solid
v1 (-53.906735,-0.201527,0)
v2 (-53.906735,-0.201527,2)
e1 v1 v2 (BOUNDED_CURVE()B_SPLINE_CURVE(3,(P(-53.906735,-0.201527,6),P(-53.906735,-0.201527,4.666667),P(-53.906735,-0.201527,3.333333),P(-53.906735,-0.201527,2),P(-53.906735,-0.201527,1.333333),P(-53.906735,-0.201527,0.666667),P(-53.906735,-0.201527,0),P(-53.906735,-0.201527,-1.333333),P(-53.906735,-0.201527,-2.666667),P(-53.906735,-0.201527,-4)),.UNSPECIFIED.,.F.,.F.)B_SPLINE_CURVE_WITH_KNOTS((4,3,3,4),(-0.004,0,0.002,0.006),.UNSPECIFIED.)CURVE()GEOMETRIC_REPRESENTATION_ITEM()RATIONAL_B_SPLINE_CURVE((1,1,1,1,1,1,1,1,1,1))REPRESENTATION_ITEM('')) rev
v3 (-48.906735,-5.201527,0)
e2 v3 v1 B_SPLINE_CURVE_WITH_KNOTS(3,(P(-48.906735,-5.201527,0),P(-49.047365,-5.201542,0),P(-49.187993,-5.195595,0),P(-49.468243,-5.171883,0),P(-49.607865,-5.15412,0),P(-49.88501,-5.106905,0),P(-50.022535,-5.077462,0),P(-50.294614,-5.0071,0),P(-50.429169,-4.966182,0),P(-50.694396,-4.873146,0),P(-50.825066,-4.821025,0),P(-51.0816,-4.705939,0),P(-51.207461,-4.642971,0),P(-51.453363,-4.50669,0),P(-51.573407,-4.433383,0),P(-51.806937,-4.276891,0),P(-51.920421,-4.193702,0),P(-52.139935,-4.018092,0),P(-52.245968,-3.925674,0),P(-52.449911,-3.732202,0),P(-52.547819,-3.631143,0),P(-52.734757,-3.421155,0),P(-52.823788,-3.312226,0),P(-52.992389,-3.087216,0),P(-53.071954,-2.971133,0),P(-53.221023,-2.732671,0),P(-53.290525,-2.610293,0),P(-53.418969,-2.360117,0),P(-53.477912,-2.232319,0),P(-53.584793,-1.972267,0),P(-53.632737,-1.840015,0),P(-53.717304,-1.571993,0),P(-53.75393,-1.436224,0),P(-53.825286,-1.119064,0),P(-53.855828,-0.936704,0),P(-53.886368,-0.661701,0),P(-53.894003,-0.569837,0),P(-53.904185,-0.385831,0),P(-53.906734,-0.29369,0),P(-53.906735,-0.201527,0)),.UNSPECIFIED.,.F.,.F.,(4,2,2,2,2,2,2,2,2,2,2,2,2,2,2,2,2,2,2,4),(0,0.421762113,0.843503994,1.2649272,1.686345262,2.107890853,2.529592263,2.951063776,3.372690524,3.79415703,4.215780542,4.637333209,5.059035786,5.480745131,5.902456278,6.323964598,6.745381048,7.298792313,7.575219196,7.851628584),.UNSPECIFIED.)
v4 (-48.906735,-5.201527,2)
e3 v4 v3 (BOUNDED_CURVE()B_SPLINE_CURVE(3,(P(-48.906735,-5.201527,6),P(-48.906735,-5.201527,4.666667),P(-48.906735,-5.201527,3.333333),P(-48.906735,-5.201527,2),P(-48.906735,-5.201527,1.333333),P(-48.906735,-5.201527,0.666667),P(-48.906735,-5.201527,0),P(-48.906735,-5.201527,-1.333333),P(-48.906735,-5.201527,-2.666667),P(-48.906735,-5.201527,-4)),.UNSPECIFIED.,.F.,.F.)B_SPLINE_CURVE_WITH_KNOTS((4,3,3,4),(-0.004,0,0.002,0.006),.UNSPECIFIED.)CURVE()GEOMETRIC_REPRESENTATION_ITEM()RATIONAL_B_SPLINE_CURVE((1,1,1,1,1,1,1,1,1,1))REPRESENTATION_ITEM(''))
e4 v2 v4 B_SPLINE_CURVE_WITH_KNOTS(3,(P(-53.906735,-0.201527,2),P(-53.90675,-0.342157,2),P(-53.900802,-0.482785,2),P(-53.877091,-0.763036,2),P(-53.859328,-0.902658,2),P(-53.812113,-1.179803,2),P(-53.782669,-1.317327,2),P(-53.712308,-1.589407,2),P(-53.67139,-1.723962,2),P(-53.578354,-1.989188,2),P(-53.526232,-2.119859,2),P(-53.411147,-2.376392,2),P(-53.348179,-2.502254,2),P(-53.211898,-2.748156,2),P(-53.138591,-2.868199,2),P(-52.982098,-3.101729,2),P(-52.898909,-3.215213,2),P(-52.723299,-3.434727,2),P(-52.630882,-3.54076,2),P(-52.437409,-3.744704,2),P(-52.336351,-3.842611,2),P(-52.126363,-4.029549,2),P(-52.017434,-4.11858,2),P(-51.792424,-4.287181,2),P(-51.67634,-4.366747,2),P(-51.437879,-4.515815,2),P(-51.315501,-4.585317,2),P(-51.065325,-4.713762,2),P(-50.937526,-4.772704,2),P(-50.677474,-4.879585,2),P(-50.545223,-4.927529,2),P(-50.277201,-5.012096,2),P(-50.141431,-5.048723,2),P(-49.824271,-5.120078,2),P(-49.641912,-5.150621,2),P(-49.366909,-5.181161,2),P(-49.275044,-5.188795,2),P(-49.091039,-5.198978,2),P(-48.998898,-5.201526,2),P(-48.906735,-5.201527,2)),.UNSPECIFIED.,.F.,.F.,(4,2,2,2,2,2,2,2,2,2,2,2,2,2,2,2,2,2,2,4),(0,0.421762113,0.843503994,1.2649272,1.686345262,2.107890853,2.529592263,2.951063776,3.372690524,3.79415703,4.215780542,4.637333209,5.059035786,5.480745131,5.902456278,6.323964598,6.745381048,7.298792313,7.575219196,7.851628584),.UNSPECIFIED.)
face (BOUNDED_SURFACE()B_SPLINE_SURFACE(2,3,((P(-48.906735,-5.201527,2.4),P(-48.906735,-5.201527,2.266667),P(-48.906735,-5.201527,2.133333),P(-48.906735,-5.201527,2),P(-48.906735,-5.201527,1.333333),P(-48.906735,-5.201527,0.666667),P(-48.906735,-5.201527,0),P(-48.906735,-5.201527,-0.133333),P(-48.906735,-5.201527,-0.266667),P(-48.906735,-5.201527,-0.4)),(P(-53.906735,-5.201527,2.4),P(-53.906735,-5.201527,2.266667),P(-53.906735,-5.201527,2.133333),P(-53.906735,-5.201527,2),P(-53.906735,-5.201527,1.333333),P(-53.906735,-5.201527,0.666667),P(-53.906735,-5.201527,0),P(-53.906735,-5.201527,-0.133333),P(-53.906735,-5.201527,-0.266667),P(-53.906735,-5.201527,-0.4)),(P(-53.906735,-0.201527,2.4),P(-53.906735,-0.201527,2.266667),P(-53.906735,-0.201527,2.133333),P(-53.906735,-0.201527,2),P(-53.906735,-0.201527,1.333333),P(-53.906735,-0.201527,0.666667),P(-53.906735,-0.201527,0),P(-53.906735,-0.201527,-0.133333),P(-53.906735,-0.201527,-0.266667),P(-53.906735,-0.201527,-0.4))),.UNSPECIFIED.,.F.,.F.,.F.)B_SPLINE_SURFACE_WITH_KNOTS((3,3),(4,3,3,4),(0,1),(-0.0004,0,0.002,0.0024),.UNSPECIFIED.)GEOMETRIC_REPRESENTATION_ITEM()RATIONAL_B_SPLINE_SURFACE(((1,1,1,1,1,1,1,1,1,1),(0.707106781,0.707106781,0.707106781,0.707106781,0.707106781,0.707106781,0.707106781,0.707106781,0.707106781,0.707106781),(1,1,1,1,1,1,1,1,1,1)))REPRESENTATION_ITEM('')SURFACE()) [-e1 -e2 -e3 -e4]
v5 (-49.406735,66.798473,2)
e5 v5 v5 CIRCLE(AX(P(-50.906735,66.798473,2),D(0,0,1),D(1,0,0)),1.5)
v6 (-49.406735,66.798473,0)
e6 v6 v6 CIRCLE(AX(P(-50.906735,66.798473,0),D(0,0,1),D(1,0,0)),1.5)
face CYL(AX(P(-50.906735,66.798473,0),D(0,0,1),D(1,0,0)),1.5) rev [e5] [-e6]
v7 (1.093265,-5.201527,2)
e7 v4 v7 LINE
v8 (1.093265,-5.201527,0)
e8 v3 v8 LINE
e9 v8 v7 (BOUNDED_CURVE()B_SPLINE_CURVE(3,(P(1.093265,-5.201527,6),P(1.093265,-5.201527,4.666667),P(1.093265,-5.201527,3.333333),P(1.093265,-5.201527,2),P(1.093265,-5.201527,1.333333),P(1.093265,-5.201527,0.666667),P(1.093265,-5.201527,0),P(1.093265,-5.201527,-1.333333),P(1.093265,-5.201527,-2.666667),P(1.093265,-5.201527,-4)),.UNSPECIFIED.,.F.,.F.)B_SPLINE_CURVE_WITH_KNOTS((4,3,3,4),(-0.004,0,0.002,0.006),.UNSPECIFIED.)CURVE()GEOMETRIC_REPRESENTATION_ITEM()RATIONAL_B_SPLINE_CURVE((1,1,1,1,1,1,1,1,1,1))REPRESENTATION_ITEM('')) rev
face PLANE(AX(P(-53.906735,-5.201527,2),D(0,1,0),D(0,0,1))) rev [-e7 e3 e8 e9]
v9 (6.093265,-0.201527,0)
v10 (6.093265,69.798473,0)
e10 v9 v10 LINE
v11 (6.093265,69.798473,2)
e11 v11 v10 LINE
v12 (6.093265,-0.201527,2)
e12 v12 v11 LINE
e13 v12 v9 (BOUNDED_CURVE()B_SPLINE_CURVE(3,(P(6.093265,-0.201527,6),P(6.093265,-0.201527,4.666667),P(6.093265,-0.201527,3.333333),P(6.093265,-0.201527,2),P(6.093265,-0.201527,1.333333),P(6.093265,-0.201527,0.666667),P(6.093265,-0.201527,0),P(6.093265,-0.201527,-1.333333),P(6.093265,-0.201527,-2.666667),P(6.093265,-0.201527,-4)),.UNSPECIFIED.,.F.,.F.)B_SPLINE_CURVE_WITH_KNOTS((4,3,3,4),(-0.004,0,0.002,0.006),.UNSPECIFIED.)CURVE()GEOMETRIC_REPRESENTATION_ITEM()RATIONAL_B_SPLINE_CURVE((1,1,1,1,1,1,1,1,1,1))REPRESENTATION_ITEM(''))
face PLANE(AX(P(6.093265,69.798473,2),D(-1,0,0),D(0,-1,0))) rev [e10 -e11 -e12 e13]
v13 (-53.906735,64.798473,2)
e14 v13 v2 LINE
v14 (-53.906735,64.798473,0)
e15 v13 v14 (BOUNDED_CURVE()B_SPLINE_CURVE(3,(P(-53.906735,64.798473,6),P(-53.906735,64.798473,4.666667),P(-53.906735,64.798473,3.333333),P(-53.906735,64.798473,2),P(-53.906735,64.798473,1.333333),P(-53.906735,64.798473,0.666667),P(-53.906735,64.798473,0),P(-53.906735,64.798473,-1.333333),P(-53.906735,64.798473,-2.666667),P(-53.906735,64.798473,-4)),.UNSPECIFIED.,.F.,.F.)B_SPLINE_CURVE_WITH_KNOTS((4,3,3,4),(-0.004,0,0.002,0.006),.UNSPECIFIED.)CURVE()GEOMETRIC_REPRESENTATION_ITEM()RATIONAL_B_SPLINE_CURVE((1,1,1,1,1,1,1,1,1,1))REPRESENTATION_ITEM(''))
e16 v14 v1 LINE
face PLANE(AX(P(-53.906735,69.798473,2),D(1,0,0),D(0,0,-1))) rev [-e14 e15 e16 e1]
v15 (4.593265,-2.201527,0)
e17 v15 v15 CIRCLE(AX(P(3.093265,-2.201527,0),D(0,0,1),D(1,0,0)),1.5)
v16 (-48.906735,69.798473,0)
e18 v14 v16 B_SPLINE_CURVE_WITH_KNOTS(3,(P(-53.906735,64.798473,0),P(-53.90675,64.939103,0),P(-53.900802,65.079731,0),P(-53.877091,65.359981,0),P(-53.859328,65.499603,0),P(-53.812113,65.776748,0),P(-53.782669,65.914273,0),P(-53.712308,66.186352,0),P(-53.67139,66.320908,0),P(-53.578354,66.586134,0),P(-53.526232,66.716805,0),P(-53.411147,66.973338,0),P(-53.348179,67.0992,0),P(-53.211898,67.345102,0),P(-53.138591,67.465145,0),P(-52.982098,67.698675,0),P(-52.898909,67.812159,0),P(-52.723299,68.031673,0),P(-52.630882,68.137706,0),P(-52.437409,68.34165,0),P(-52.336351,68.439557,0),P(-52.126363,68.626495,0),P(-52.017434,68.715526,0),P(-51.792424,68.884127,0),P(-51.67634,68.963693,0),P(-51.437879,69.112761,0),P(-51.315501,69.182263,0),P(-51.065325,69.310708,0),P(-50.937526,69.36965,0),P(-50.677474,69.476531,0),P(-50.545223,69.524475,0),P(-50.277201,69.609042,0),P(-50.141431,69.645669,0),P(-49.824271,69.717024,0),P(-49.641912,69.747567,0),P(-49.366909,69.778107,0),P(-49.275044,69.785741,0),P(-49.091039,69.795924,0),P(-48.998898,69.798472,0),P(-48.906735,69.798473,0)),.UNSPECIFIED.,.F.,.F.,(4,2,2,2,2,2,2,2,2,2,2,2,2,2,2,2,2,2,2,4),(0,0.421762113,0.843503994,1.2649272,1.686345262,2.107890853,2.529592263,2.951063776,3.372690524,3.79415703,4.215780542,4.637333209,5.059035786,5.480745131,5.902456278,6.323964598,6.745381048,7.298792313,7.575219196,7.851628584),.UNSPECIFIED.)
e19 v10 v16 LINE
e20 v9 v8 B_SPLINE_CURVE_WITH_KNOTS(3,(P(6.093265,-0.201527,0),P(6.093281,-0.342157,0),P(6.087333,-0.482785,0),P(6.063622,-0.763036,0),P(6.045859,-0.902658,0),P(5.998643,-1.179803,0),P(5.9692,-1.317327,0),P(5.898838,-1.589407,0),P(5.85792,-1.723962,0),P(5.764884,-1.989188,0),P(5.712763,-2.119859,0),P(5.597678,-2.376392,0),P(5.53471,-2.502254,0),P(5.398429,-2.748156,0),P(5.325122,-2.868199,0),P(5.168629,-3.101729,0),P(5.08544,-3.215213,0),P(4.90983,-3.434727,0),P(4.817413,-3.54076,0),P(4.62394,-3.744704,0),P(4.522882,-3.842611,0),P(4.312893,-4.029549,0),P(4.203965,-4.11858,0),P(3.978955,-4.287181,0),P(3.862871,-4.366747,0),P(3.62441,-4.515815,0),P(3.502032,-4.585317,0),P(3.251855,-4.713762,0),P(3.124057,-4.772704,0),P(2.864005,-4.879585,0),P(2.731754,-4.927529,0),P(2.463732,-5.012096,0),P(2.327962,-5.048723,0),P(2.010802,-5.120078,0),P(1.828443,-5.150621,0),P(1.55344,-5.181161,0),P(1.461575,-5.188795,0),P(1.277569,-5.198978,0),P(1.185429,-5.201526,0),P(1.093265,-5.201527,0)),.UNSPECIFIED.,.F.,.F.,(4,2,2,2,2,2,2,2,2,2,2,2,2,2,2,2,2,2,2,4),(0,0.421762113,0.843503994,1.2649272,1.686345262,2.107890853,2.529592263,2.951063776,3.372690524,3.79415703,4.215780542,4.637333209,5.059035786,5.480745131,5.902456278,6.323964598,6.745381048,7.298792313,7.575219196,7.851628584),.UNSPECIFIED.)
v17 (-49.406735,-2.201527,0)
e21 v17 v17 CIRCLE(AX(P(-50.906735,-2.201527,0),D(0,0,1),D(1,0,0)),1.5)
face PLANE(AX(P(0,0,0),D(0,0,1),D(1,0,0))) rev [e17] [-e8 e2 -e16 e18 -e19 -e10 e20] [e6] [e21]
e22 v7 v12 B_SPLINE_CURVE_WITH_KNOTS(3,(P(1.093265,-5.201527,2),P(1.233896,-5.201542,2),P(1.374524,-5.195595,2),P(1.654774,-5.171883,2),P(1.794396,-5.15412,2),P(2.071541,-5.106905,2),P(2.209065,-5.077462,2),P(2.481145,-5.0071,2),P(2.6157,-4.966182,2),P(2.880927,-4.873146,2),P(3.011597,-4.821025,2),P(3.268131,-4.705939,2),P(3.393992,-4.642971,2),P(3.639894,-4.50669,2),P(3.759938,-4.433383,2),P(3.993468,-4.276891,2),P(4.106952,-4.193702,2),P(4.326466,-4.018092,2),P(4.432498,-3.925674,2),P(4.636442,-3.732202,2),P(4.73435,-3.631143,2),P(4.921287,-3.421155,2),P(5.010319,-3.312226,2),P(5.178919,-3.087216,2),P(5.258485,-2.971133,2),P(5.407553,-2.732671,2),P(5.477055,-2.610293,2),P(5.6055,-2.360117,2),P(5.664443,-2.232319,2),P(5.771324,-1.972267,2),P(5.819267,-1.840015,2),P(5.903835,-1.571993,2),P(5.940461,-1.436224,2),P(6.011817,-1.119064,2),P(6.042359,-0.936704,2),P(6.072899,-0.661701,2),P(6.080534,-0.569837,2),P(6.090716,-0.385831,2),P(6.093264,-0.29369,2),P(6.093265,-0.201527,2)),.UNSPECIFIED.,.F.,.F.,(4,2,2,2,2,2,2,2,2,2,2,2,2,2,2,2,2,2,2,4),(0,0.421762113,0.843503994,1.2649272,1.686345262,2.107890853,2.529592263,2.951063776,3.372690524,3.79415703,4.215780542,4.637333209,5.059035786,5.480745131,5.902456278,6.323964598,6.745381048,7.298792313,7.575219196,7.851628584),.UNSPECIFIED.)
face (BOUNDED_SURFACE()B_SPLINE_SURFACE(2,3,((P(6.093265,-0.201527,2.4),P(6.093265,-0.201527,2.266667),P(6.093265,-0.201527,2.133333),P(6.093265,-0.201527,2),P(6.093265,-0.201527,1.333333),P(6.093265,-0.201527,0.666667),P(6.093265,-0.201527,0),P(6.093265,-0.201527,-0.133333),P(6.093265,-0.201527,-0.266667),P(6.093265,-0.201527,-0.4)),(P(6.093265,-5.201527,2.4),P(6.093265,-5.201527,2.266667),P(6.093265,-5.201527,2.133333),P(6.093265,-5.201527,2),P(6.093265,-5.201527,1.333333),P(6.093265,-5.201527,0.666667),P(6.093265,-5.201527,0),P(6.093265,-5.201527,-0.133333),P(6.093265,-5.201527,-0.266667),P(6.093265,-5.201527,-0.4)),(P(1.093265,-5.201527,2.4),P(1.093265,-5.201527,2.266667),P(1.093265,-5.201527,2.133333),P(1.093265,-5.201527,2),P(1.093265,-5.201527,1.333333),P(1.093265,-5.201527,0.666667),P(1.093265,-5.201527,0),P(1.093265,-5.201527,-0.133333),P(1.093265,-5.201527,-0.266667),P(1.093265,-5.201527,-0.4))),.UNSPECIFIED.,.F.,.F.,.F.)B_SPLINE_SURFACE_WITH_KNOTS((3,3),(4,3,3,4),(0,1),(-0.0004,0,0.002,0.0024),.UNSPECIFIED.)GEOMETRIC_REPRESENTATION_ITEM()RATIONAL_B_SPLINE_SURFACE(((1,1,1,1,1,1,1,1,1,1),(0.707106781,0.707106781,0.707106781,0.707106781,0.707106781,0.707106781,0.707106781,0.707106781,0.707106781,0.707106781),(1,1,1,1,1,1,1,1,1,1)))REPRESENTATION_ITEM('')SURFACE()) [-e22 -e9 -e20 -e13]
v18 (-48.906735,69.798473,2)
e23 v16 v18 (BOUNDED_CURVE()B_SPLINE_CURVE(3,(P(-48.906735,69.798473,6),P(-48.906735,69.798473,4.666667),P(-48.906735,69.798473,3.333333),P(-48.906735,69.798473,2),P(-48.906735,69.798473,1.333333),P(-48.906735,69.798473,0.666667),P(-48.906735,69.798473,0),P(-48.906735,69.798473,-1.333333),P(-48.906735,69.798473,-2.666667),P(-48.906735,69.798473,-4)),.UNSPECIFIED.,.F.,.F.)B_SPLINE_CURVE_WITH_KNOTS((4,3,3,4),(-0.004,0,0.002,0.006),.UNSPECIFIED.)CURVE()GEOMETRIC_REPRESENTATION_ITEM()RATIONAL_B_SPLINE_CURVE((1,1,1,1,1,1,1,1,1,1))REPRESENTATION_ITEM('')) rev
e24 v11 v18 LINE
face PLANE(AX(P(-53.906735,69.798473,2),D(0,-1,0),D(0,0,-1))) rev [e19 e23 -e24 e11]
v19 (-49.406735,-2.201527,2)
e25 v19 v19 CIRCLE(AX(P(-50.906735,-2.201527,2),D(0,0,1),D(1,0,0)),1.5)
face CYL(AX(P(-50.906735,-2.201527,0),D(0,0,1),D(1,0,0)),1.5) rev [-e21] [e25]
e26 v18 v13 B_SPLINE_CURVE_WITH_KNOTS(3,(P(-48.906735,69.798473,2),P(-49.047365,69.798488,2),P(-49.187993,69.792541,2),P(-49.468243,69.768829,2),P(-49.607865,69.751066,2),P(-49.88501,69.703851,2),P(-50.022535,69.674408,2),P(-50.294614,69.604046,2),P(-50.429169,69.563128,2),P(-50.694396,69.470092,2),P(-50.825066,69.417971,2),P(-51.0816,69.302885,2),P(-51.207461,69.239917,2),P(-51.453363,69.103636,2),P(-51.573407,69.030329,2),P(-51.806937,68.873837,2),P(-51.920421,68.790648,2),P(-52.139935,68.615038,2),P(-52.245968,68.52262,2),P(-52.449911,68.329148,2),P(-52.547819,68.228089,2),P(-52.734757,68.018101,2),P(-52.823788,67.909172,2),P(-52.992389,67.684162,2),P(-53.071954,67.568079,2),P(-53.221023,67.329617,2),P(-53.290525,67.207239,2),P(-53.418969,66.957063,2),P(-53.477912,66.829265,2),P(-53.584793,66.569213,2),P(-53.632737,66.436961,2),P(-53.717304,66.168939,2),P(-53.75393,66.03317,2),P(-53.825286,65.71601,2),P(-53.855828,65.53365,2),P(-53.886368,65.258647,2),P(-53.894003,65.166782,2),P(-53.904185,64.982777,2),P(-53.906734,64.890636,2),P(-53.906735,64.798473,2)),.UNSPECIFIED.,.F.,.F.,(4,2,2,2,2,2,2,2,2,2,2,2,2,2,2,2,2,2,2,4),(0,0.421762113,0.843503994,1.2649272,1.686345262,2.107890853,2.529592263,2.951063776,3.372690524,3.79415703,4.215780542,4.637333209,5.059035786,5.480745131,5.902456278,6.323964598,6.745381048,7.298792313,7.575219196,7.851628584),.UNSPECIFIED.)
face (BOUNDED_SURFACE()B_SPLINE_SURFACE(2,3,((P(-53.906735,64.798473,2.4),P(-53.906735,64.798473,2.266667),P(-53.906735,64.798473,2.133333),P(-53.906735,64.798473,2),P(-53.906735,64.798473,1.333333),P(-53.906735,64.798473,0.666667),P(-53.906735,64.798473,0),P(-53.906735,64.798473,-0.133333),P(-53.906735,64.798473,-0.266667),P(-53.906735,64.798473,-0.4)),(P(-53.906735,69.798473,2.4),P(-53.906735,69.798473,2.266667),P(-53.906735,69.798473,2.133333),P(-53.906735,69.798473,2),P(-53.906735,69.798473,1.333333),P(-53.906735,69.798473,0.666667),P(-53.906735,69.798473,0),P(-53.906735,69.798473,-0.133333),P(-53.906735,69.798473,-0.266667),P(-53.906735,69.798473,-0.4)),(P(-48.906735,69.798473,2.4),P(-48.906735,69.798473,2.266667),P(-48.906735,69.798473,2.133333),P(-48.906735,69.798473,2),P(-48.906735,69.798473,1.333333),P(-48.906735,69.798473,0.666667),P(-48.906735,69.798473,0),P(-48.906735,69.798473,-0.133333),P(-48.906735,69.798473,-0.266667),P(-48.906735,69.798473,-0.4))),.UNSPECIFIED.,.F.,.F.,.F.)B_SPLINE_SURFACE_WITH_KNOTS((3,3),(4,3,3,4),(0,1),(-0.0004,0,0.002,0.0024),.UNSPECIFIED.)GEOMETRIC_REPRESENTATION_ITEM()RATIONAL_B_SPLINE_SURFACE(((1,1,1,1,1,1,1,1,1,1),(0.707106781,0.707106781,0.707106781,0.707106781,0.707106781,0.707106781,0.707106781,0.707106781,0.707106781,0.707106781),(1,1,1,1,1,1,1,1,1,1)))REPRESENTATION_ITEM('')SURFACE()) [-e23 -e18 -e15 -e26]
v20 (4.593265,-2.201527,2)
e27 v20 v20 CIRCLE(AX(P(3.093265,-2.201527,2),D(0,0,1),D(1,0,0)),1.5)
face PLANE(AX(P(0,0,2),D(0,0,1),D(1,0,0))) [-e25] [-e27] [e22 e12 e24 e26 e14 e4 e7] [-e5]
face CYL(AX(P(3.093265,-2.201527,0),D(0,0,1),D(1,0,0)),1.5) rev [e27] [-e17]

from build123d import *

# Parameters (mm, degrees)
SKETCH1_W           = 60
SKETCH1_H           = 75
BOSS_EXTRUDE1_DEPTH = 2
SKETCH2_R           = 1.5
CUT_EXTRUDE1_DEPTH  = 2
FILLET1_R           = 5


with BuildPart() as part:
    # Sketch1 → Boss-Extrude1 (new body)
    with BuildSketch(Plane.XY):
        with Locations((-23.906734616, 32.298472976)):
            Rectangle(SKETCH1_W, SKETCH1_H)
    extrude(amount=BOSS_EXTRUDE1_DEPTH)

    # Sketch2 → Cut-Extrude1 (cut)
    with BuildSketch(Plane.XY.offset(2)):
        with Locations((-50.906734616, -2.201527024)):
            Circle(SKETCH2_R)
        with Locations((3.093265384, -2.201527024)):
            Circle(SKETCH2_R)
        with Locations((-50.906734616, 66.798472976)):
            Circle(SKETCH2_R)
    extrude(amount=-CUT_EXTRUDE1_DEPTH, mode=Mode.SUBTRACT)

    # Fillet1
    fillet1_edges = [part.edges().sort_by_distance(p)[0] for p in [
        (6.093265384, -5.201527024, 1),
        (-53.906734616, -5.201527024, 1),
        (-53.906734616, 69.798472976, 1),
    ]]
    fillet(fillet1_edges, radius=FILLET1_R)


solid = part.part
